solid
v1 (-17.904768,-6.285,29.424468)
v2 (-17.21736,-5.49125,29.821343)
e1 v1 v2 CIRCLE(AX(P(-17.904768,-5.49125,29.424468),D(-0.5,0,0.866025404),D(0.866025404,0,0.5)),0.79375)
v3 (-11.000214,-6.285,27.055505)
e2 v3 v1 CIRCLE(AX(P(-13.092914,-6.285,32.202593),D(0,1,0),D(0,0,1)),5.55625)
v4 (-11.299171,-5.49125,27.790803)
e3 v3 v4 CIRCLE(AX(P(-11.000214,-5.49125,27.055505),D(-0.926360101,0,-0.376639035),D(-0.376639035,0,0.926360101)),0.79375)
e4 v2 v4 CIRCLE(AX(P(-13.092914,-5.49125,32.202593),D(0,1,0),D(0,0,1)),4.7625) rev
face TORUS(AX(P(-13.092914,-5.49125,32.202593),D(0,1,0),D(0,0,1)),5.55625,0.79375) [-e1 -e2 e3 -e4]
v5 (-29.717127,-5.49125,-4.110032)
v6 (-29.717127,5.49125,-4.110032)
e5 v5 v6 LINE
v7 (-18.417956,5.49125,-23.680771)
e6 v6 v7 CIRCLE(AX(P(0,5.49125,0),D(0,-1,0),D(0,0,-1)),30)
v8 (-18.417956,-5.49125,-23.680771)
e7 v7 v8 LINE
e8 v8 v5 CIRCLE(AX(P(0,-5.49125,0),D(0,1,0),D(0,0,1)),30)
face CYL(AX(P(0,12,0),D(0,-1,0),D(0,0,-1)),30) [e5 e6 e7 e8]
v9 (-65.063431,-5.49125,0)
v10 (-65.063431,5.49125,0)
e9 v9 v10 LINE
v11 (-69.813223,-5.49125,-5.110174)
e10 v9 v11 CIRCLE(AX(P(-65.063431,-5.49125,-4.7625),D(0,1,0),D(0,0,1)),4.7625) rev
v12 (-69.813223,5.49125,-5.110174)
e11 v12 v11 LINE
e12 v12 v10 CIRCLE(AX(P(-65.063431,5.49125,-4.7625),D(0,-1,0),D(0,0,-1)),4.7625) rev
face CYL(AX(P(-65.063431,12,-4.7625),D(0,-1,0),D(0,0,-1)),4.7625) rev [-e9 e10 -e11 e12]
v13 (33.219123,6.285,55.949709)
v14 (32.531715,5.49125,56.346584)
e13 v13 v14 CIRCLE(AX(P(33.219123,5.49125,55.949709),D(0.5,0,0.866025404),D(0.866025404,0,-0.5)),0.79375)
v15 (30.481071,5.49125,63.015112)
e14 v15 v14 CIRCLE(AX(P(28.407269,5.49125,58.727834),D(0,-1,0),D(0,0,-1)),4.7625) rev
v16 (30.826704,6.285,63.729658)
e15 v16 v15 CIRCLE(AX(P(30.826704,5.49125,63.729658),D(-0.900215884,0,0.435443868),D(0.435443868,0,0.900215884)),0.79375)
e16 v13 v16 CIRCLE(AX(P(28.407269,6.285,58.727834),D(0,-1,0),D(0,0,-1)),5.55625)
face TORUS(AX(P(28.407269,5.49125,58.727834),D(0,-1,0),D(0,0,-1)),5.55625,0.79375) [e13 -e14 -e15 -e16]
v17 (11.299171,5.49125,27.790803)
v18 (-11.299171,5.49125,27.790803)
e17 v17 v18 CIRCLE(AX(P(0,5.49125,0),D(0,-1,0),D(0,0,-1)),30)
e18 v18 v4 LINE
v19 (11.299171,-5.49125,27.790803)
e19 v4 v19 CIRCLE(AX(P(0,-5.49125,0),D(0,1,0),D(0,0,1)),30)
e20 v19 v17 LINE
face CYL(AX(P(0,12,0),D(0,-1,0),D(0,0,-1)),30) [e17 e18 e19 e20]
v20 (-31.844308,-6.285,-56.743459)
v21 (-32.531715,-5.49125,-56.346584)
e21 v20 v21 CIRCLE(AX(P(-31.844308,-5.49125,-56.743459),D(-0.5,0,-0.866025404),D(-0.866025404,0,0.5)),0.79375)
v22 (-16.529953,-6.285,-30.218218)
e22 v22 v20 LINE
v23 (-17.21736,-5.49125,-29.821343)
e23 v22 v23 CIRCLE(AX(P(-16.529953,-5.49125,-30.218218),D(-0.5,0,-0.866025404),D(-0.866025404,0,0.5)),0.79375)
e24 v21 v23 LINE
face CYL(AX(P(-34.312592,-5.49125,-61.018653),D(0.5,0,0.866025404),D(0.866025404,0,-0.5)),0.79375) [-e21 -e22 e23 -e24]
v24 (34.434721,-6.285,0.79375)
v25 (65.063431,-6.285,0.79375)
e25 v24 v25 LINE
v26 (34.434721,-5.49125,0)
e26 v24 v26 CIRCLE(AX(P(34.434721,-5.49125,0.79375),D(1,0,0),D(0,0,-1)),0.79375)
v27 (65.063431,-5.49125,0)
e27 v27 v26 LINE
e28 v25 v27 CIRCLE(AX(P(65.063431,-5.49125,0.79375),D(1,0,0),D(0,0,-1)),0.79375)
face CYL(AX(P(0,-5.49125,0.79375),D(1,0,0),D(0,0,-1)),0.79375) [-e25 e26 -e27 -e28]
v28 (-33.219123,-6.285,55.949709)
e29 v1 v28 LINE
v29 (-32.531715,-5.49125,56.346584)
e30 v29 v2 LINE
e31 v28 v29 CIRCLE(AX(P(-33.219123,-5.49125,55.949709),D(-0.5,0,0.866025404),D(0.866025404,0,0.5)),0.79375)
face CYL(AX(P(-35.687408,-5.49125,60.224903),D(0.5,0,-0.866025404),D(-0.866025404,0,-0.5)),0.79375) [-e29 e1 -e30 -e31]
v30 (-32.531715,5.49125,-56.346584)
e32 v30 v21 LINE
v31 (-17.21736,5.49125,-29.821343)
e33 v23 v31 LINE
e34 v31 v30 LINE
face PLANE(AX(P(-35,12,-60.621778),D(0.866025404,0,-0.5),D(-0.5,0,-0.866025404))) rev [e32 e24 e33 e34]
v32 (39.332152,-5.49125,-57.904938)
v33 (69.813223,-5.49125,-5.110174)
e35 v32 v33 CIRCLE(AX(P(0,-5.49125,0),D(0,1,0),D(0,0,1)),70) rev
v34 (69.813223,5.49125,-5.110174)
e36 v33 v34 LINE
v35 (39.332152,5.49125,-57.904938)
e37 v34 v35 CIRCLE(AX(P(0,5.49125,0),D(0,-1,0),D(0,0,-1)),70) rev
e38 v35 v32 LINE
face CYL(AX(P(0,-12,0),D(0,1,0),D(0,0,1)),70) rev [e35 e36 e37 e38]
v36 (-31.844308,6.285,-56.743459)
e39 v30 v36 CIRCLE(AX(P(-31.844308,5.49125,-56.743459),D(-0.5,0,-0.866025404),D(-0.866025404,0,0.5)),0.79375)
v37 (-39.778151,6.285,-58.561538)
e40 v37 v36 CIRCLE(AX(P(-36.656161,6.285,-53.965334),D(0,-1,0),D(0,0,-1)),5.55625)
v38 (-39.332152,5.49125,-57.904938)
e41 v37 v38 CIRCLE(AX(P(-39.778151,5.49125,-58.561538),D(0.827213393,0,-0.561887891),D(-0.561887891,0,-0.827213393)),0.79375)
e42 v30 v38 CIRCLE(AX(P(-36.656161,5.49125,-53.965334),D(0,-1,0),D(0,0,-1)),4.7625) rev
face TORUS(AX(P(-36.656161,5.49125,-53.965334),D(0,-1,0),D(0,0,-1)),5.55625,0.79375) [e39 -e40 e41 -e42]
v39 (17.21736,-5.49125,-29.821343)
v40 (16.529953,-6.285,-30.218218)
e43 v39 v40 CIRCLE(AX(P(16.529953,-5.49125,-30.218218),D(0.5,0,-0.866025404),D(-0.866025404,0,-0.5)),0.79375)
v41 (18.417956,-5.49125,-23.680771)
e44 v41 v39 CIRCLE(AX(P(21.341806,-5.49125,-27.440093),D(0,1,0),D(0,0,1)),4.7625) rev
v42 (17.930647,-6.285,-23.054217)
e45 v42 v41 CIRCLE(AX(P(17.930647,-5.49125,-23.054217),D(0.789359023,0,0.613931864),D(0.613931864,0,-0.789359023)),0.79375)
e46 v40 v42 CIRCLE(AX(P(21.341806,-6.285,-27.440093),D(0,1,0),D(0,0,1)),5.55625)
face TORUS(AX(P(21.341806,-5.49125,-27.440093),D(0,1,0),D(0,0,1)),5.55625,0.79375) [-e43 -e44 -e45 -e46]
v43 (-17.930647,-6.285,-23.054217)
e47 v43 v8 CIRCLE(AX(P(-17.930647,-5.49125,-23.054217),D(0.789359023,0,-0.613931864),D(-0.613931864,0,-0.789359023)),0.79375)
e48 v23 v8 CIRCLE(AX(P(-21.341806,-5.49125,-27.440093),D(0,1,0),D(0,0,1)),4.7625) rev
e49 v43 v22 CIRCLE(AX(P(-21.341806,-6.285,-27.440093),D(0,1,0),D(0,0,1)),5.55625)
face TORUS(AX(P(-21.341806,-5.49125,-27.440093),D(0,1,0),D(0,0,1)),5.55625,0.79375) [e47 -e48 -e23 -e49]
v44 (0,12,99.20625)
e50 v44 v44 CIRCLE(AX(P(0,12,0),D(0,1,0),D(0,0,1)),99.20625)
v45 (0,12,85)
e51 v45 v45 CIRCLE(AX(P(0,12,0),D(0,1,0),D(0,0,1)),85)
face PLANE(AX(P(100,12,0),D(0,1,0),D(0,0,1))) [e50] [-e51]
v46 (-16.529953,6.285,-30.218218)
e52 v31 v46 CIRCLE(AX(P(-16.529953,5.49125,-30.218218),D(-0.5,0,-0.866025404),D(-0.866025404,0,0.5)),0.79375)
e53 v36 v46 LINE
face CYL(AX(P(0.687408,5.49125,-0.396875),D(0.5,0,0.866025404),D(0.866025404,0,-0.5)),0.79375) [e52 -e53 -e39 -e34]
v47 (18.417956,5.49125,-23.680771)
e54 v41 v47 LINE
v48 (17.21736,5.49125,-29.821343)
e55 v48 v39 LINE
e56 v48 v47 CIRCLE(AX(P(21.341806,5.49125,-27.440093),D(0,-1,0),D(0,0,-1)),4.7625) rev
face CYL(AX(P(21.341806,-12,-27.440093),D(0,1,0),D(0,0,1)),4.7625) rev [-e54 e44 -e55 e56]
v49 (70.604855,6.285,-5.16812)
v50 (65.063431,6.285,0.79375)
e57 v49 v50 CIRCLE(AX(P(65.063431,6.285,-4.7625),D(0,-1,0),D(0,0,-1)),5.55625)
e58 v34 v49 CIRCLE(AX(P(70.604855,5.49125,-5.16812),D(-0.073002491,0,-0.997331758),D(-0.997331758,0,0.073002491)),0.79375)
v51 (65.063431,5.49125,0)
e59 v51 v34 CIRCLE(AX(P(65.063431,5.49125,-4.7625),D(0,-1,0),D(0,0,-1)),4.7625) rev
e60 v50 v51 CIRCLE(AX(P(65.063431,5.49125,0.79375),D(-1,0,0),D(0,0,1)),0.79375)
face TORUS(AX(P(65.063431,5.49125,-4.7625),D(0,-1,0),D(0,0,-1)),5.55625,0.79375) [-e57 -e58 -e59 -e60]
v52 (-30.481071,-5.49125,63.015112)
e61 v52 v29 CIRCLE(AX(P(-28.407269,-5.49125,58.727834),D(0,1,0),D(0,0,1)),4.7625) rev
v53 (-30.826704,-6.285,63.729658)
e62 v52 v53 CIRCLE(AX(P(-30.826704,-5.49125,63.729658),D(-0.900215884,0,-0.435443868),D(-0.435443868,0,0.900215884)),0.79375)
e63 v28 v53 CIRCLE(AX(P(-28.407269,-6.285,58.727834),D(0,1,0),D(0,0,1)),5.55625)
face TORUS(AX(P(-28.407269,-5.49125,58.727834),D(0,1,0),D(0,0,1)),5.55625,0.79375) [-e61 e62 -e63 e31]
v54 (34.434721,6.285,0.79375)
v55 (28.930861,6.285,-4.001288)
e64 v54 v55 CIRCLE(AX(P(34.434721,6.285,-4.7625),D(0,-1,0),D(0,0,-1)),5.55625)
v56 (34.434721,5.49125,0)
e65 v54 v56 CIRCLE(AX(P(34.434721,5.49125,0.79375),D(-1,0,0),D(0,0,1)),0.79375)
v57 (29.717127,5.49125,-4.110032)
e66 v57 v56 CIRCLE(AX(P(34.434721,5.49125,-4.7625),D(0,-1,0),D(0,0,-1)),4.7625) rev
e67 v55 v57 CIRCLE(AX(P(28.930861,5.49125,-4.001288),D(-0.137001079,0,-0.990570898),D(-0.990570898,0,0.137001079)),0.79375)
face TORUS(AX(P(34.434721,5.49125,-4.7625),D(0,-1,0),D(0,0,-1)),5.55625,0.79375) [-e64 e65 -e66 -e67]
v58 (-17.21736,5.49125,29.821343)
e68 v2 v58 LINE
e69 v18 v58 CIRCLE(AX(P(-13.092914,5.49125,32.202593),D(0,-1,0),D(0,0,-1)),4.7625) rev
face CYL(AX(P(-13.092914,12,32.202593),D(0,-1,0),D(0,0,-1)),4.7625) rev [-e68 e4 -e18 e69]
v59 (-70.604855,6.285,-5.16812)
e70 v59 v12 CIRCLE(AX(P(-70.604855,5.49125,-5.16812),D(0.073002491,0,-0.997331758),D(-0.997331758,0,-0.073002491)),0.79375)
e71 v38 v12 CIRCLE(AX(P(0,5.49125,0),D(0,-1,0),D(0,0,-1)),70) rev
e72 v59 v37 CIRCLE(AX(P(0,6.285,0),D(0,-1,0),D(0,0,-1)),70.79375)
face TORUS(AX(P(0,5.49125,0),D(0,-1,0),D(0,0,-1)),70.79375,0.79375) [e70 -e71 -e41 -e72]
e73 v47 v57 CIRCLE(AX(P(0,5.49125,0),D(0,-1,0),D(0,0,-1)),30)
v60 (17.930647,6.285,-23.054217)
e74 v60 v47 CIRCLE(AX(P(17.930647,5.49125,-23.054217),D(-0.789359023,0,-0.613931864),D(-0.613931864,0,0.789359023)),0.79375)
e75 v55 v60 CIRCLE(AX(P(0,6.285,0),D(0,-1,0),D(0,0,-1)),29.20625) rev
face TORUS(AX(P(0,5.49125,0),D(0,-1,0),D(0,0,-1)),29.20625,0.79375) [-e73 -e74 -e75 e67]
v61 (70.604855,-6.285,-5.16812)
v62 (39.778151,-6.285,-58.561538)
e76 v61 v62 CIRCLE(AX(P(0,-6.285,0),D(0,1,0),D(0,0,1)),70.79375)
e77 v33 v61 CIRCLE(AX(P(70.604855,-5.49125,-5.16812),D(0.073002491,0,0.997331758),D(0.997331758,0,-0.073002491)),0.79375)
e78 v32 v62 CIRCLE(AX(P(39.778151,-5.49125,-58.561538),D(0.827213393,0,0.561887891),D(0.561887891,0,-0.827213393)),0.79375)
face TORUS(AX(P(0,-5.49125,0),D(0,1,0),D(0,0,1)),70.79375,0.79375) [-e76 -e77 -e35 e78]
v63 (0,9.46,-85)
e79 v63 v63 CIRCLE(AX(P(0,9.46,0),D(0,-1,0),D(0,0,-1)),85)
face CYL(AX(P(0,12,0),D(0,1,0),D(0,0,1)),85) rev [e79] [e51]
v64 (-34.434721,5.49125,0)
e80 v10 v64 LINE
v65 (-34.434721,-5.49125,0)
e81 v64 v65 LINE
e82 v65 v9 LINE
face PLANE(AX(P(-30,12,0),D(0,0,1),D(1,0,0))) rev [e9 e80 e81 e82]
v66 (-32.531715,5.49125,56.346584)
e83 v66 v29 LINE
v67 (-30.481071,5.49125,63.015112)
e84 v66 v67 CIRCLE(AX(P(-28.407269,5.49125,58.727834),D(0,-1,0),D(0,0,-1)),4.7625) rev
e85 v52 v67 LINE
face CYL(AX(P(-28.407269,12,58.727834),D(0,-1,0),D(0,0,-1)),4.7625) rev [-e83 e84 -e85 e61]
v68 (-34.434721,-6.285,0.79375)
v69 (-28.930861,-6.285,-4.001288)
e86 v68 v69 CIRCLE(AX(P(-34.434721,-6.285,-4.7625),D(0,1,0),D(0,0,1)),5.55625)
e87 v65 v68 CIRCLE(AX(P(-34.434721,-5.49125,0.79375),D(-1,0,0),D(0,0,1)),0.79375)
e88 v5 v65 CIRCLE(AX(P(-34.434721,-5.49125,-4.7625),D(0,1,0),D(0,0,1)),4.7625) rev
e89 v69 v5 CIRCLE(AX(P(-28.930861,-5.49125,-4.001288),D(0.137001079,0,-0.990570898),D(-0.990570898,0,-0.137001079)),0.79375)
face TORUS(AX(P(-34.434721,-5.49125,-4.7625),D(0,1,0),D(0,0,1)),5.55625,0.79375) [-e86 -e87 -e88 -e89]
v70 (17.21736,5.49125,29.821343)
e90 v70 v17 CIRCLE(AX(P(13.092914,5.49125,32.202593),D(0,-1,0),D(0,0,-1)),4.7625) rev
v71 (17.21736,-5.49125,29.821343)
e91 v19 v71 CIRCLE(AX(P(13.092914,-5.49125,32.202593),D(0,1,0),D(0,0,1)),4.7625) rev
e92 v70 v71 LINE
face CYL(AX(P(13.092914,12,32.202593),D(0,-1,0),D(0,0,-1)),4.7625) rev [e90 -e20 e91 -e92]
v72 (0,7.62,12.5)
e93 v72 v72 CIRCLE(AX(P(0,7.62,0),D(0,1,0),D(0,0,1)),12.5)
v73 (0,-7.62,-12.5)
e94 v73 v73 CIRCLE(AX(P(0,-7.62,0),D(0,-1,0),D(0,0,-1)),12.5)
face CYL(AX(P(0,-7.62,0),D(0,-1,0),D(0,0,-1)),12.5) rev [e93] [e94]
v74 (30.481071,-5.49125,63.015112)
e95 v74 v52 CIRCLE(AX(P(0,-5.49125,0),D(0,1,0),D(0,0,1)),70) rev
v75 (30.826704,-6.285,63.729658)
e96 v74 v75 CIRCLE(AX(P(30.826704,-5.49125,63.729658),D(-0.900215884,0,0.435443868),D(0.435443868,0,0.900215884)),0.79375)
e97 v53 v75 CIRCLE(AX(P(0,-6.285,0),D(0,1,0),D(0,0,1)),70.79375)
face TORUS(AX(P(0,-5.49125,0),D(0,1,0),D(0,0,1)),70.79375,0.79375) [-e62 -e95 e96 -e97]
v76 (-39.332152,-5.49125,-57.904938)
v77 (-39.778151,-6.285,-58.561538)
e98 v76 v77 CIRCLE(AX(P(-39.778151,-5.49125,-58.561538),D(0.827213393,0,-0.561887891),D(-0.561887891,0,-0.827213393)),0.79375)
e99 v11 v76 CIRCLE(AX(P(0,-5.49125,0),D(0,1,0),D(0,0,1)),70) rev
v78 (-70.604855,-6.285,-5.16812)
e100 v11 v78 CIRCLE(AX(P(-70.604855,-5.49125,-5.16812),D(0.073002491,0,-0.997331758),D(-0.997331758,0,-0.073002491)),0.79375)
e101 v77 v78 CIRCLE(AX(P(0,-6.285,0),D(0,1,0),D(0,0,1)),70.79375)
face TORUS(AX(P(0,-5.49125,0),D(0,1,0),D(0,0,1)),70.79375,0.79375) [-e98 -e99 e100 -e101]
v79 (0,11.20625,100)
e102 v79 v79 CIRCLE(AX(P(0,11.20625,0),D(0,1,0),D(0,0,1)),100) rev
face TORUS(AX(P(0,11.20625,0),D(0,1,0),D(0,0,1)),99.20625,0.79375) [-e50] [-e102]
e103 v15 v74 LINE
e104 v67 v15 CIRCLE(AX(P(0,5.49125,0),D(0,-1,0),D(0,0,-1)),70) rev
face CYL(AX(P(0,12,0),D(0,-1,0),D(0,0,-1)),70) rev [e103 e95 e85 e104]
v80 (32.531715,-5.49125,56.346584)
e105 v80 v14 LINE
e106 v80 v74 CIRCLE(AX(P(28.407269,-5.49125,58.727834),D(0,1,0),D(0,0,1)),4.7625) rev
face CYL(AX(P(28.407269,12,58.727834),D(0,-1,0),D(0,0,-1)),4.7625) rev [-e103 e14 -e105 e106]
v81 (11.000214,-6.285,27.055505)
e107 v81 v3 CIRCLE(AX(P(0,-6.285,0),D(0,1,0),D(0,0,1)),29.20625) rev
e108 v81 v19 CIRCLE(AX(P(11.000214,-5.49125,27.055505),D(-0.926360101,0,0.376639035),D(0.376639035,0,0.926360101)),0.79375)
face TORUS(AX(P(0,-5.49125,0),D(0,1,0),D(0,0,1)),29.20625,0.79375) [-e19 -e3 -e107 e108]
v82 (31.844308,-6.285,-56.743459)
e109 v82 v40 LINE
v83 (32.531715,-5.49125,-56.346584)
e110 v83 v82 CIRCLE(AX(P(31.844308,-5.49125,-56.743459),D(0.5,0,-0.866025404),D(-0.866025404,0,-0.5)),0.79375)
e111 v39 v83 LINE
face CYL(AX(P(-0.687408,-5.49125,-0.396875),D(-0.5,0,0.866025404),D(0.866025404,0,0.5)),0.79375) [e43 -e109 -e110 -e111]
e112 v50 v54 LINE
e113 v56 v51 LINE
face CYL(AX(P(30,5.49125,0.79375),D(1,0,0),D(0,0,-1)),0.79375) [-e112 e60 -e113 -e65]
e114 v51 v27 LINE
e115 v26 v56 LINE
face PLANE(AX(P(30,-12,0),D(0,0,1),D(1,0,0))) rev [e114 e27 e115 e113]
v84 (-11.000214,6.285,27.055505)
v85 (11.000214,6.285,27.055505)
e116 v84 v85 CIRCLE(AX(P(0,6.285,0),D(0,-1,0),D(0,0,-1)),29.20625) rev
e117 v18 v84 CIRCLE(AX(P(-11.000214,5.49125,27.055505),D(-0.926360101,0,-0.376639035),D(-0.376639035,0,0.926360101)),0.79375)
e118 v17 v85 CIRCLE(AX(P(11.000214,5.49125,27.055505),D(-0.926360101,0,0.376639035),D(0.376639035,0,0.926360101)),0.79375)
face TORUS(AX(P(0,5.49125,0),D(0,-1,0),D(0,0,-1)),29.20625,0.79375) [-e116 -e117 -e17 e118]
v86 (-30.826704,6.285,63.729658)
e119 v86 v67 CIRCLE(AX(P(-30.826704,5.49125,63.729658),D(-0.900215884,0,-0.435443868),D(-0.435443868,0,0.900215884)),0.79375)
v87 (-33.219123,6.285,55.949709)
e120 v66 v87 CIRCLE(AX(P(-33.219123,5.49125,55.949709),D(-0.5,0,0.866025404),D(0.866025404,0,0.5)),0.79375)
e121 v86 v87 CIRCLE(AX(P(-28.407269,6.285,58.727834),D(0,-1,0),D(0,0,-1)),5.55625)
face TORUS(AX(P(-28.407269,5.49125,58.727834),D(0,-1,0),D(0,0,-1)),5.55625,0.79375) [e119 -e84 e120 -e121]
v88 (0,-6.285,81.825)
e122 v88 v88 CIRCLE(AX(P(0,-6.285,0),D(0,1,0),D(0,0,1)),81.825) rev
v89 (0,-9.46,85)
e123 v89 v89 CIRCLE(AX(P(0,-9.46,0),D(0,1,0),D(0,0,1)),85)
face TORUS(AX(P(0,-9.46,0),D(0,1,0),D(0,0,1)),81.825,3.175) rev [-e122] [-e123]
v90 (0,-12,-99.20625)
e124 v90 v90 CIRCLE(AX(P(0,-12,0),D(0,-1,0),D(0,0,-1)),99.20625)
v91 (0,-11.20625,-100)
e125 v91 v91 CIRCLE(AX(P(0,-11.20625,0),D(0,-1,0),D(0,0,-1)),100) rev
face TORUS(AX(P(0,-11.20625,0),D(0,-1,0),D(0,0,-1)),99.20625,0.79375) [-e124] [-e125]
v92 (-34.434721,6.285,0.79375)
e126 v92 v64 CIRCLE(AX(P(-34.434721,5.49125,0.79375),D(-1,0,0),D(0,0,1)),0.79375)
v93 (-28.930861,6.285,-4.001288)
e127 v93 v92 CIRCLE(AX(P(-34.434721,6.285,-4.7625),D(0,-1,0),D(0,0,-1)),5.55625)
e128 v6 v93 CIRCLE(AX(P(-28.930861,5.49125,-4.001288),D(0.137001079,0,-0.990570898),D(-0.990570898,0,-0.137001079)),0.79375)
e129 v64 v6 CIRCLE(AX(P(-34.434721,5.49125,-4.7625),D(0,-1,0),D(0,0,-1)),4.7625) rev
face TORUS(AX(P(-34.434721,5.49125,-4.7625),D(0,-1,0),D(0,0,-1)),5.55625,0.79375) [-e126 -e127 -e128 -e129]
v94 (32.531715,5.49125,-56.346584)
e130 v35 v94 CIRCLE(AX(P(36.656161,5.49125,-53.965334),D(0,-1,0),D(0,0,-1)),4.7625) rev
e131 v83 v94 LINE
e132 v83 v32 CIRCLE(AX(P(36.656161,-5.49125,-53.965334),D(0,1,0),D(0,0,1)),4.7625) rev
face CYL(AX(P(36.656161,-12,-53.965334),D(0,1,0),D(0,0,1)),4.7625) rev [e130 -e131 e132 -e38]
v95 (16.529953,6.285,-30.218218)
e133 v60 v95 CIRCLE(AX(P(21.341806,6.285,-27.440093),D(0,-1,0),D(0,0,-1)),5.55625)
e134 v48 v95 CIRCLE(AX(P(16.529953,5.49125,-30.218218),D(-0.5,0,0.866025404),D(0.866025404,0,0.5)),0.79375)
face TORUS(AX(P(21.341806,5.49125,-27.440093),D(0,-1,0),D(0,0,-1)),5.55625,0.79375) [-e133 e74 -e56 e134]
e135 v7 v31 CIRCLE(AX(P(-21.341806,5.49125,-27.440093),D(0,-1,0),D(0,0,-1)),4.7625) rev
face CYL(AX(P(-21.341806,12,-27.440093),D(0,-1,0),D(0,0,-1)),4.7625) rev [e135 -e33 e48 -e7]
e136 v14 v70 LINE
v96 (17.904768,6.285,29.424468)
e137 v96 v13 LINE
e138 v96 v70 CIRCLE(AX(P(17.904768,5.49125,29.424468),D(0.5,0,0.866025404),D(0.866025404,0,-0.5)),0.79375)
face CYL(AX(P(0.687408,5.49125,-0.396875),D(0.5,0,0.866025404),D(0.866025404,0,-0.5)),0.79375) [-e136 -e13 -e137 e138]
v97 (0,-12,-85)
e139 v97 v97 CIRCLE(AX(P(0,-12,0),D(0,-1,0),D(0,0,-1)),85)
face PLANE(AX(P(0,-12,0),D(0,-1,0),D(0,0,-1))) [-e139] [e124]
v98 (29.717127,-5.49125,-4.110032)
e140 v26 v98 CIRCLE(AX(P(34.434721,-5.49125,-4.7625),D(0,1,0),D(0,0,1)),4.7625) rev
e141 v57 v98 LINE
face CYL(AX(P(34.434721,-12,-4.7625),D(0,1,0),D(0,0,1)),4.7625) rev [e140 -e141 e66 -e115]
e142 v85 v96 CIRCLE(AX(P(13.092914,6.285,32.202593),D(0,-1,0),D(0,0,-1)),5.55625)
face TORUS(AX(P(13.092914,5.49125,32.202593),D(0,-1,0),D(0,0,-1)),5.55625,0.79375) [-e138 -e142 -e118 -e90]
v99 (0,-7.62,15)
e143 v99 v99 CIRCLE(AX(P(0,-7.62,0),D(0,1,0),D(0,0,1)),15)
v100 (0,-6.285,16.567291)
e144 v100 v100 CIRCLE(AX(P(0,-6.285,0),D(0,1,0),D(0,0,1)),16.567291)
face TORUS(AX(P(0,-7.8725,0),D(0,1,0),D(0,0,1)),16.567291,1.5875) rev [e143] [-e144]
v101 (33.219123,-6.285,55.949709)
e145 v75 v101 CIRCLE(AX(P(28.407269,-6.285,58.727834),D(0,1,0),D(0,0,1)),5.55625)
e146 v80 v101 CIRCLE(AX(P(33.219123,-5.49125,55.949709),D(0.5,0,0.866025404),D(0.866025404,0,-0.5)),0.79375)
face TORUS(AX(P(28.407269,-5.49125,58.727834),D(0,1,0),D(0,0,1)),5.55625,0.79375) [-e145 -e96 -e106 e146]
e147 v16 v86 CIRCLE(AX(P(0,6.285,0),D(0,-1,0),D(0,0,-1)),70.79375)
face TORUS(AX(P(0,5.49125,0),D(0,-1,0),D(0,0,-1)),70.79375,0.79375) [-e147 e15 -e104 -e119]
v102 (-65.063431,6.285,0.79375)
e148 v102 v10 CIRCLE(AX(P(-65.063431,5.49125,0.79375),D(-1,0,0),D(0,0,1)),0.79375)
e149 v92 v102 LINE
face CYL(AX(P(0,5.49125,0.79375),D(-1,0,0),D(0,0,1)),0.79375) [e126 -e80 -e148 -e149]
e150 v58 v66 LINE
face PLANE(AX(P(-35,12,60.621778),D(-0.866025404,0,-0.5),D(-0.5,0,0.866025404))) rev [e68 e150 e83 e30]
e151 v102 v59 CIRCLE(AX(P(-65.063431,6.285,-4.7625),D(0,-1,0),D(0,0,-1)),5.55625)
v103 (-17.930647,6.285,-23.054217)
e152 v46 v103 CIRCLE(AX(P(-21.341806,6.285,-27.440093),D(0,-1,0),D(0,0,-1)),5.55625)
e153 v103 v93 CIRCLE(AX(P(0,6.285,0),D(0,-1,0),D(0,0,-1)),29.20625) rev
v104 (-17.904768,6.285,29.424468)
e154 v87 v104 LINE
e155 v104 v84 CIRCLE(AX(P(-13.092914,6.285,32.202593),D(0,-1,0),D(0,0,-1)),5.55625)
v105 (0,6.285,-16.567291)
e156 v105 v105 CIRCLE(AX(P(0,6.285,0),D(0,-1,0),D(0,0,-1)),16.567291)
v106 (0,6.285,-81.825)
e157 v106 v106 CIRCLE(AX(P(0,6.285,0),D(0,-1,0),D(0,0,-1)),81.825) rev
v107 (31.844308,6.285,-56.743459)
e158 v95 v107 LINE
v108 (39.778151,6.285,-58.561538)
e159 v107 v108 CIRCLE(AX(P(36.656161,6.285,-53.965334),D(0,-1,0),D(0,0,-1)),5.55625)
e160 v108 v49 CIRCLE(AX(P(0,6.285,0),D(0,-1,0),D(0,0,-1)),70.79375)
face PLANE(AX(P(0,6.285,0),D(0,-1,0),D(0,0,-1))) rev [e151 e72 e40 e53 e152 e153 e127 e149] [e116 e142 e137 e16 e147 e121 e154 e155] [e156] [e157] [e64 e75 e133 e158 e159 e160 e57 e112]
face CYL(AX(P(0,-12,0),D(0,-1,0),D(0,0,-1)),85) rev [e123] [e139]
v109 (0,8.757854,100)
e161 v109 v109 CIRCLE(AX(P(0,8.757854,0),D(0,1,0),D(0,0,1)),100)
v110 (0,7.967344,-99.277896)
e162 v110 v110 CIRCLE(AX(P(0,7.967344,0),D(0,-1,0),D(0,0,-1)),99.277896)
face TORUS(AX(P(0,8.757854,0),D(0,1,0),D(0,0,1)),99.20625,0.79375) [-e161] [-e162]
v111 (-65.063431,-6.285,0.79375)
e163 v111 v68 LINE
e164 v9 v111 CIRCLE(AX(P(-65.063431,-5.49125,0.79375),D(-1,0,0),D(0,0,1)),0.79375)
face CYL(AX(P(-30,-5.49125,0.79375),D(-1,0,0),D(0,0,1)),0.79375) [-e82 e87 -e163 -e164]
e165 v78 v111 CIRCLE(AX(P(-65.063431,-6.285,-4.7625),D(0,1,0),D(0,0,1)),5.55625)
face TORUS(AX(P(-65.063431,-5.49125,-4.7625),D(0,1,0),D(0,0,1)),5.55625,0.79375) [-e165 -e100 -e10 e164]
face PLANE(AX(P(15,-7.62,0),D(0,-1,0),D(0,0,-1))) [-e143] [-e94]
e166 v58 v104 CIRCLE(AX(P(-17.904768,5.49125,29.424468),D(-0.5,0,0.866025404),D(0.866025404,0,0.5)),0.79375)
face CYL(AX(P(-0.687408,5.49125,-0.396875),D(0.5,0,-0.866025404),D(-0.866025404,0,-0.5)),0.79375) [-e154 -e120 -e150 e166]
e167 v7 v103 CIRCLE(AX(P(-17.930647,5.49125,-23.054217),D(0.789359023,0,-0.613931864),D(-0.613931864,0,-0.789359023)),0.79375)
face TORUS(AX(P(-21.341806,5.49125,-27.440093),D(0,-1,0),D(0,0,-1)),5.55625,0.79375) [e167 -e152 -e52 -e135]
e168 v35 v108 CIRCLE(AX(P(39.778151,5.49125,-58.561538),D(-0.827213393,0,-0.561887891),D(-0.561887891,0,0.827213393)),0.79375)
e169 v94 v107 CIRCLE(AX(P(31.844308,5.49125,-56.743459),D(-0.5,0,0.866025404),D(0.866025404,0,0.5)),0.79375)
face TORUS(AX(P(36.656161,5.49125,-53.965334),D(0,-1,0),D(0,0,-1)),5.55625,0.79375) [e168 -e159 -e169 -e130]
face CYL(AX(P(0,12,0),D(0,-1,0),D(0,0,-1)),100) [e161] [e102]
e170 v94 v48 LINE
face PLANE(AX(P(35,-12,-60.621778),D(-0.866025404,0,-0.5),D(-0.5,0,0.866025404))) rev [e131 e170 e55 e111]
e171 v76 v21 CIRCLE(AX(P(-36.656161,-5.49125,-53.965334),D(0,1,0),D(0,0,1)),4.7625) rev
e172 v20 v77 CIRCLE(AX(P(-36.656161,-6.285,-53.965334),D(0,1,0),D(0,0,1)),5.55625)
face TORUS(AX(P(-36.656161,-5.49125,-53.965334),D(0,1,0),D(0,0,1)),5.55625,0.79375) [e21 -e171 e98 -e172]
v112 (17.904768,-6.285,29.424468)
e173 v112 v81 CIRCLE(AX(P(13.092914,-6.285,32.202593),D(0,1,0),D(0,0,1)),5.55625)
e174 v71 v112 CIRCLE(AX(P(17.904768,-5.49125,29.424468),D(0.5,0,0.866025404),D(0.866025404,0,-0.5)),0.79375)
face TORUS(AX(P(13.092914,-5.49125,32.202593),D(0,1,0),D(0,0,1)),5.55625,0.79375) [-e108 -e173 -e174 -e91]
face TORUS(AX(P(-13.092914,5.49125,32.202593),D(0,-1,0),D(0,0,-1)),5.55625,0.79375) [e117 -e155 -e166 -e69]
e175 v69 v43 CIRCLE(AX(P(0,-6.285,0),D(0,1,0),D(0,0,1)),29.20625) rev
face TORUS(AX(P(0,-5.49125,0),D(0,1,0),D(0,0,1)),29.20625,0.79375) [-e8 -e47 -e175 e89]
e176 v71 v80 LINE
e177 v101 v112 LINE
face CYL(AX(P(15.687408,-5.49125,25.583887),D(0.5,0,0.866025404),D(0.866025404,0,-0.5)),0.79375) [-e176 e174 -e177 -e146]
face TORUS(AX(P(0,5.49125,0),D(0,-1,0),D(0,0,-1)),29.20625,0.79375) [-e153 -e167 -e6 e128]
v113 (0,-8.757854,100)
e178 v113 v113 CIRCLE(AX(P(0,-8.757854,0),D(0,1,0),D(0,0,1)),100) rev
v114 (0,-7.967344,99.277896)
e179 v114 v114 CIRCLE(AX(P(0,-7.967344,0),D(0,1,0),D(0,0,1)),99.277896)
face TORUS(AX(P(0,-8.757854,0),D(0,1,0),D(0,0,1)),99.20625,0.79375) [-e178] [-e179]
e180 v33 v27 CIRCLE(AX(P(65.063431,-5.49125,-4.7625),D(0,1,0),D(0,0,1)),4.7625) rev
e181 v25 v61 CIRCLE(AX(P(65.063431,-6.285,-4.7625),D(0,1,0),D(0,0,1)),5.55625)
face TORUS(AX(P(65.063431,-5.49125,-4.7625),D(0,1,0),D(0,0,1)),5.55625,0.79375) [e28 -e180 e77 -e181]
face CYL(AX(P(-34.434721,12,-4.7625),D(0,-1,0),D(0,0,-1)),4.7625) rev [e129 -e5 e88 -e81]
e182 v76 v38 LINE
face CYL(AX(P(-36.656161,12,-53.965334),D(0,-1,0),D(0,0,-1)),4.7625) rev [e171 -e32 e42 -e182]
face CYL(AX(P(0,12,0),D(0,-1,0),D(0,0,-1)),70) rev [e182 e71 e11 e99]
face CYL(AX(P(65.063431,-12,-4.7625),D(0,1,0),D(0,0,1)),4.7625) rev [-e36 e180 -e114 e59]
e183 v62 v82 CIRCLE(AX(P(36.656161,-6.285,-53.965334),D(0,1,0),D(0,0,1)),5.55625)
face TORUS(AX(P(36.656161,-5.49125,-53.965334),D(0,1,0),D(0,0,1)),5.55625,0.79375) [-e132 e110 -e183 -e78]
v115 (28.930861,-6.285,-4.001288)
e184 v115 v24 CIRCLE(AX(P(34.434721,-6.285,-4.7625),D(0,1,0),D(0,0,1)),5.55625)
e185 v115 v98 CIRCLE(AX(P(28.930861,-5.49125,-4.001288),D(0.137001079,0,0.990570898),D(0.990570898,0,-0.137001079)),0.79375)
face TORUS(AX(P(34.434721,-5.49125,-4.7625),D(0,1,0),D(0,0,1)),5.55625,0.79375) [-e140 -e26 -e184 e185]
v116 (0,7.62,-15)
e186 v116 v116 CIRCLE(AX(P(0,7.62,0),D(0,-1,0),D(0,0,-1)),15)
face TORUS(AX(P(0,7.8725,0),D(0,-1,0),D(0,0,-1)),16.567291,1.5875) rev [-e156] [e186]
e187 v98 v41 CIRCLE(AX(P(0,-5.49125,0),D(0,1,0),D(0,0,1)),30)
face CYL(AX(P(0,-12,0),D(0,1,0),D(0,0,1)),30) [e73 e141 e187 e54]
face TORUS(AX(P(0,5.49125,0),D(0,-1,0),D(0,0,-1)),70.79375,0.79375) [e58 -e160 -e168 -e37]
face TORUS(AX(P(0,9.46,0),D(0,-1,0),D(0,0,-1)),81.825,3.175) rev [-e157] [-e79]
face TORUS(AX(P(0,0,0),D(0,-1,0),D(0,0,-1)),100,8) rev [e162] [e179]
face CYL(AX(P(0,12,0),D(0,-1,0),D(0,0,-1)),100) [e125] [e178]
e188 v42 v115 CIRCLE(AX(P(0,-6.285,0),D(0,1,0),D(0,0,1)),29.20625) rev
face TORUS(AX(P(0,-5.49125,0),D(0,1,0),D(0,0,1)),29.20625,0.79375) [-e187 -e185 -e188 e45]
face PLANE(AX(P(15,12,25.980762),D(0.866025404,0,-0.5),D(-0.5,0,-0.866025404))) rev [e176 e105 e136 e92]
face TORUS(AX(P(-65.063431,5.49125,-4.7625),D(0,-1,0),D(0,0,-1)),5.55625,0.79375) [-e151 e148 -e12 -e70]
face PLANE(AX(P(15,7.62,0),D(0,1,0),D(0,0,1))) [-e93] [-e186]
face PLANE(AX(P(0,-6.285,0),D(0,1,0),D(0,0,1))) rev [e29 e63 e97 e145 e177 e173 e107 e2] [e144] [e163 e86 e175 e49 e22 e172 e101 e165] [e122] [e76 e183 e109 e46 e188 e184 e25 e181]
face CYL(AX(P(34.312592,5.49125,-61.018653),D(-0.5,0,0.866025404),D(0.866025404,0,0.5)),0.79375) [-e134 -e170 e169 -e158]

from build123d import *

# Parameters (mm, degrees)
HOLE1_D                   = 170
HOLE1_DEPTH               = 5.715
HOLE2_D                   = 170
HOLE2_DEPTH               = 5.715
CUT_EXTRUDE1_DEPTH        = 143.598531637
CUT_EXTRUDE2_DEPTH        = 143.598531637
CUT_EXTRUDE3_DEPTH        = 143.598531637
SKETCH9_W                 = 15
SKETCH9_H                 = 5.715
SKETCH10_W                = 15
SKETCH10_H                = 6.539353837
M18_CLEARANCE_HOLE1_D     = 25
M18_CLEARANCE_HOLE1_DEPTH = 19.62
M18_CLEARANCE_HOLE1_TIP   = 7.510757738
FILLET1_R                 = 4.7625
FILLET2_R                 = 0.79375
FILLET3_R                 = 1.5875
FILLET4_R                 = 3.175


with BuildPart() as part:
    # Sketch1 → Revolve1 (revolve)
    with BuildSketch(Plane.XY, mode=Mode.PRIVATE) as revolve1_sk:
        with BuildLine():
            Line((100, 12), (0, 12))
            Line((0, 12), (0, -12))
            Line((0, -12), (100, -12))
            Line((100, -12), (100, -8))
            ThreePointArc((100, -8), (92, 0), (100, 8))
            Line((100, 8), (100, 12))
        make_face()
    revolve(revolve1_sk.sketch.rotate(Axis((0, 12, 0), (0, -1, 0)), 270), axis=Axis((0, 12, 0), (0, -1, 0)))

    # Hole1
    with Locations(Plane(origin=(0, -12, 0), x_dir=(-1, 0, 0), z_dir=(0, -1, 0))):
        with Locations((0, 0)):
            Hole(HOLE1_D / 2, depth=HOLE1_DEPTH)

    # Hole2
    with Locations(Plane(origin=(0, 12, 0), x_dir=(1, 0, 0), z_dir=(0, 1, 0))):
        with Locations((0, 0)):
            Hole(HOLE2_D / 2, depth=HOLE2_DEPTH)

    # Sketch6 → Cut-Extrude1 (cut, through all)
    with BuildSketch(Plane.XZ.offset(6.285)):
        with BuildLine():
            Line((-35, -60.621778265), (-15, -25.980762114))
            ThreePointArc((-15, -25.980762114), (-25.980762114, -15), (-30, 0))
            Line((-30, 0), (-70, 0))
            ThreePointArc((-70, 0), (-60.621778265, -35), (-35, -60.621778265))
        make_face()
    extrude(amount=-CUT_EXTRUDE1_DEPTH, mode=Mode.SUBTRACT)

    # Sketch7 → Cut-Extrude2 (cut, through all)
    with BuildSketch(Plane.XZ.offset(6.285)):
        with BuildLine():
            Line((-35, 60.621778265), (-15, 25.980762114))
            ThreePointArc((-15, 25.980762114), (0, 30), (15, 25.980762114))
            Line((15, 25.980762114), (35, 60.621778265))
            ThreePointArc((35, 60.621778265), (0, 70), (-35, 60.621778265))
        make_face()
    extrude(amount=-CUT_EXTRUDE2_DEPTH, mode=Mode.SUBTRACT)

    # Sketch8 → Cut-Extrude3 (cut, through all)
    with BuildSketch(Plane(origin=(0, 6.285, 0), x_dir=(-1, 0, 0), z_dir=(0, 1, 0))):
        with BuildLine():
            Line((-35, -60.621778265), (-15, -25.980762114))
            ThreePointArc((-15, -25.980762114), (-25.980762114, -15), (-30, 0))
            Line((-30, 0), (-70, 0))
            ThreePointArc((-70, 0), (-60.621778265, -35), (-35, -60.621778265))
        make_face()
    extrude(amount=-CUT_EXTRUDE3_DEPTH, mode=Mode.SUBTRACT)

    # Sketch9 → Revolve2 (revolve)
    with BuildSketch(Plane.XY, mode=Mode.PRIVATE) as revolve2_sk:
        with Locations((7.5, 4.7625)):
            Rectangle(SKETCH9_W, SKETCH9_H)
    revolve(revolve2_sk.sketch.rotate(Axis((0, 7.62, 0), (0, -1, 0)), 270), axis=Axis((0, 7.62, 0), (0, -1, 0)))

    # Sketch10 → Revolve3 (revolve)
    with BuildSketch(Plane(origin=(0, 0, 0), x_dir=(-1, 0, 0), z_dir=(0, 0, -1)), mode=Mode.PRIVATE) as revolve3_sk:
        with Locations((-7.5, -4.350323082)):
            Rectangle(SKETCH10_W, SKETCH10_H)
    revolve(revolve3_sk.sketch.rotate(Axis((0, -7.62, 0), (0, 1, 0)), 270), axis=Axis((0, -7.62, 0), (0, 1, 0)))

    # M18 Clearance Hole1
    with Locations(Plane(origin=(0, -7.62, 0), x_dir=(-1, 0, 0), z_dir=(0, -1, 0))):
        with Locations((0, 0)):
            Hole(M18_CLEARANCE_HOLE1_D / 2, depth=M18_CLEARANCE_HOLE1_DEPTH)
            with Locations((0, 0, -(M18_CLEARANCE_HOLE1_DEPTH + M18_CLEARANCE_HOLE1_TIP / 2))):  # 118° drill point
                Cone(0, M18_CLEARANCE_HOLE1_D / 2, M18_CLEARANCE_HOLE1_TIP, mode=Mode.SUBTRACT)

    # Fillet1
    fillet1_edges = [part.edges().sort_by_distance(p)[0] for p in [
        (-35, 0, -60.621778265),
        (-70, 0, 0),
        (-30, 0, 0),
        (-15, 0, -25.980762114),
        (-35, 0, 60.621778265),
        (35, 0, 60.621778265),
        (15, 0, 25.980762114),
        (-15, 0, 25.980762114),
        (35, 0, -60.621778265),
        (70, 0, 0),
        (30, 0, 0),
        (15, 0, -25.980762114),
    ]]
    fillet(fillet1_edges, radius=FILLET1_R)

    # Fillet2
    fillet2_edges = [part.edges().sort_by_distance(p)[0] for p in [
        (-24.87453786, -6.285, 43.083963388),
        (-24.87453786, 6.285, 43.083963388),
        (0, -6.285, 70),
        (0, 6.285, 70),
        (24.87453786, -6.285, 43.083963388),
        (24.87453786, 6.285, 43.083963388),
        (0, -6.285, 30),
        (0, 6.285, 30),
        (25.980762114, 6.285, -15),
        (25.980762114, -6.285, -15),
        (24.87453786, 6.285, -43.083963388),
        (24.87453786, -6.285, -43.083963388),
        (-49.749075719, -6.285, 0),
        (-49.749075719, 6.285, 0),
        (60.621778265, 6.285, -35),
        (60.621778265, -6.285, -35),
        (49.749075719, 6.285, 0),
        (49.749075719, -6.285, 0),
        (-25.980762114, -6.285, -15),
        (-25.980762114, 6.285, -15),
        (-35.592384032, -6.285, -58.607508261),
        (-35.592384032, 6.285, -58.607508261),
        (-32.959398991, -6.285, 60.127662883),
        (-32.959398991, 6.285, 60.127662883),
        (14.638494198, -6.285, 27.697863351),
        (14.638494198, 6.285, 27.697863351),
        (16.667806194, 6.285, -26.526239524),
        (16.667806194, -6.285, -26.526239524),
        (-68.551783023, -6.285, -1.520154622),
        (-68.551783023, 6.285, -1.520154622),
        (35.592384032, 6.285, -58.607508261),
        (35.592384032, -6.285, -58.607508261),
        (-14.638494198, -6.285, 27.697863351),
        (-14.638494198, 6.285, 27.697863351),
        (68.551783023, 6.285, -1.520154622),
        (68.551783023, -6.285, -1.520154622),
        (32.959398991, -6.285, 60.127662883),
        (32.959398991, 6.285, 60.127662883),
        (-16.667806194, -6.285, -26.526239524),
        (-16.667806194, 6.285, -26.526239524),
        (-31.306300392, -6.285, -1.171623827),
        (-31.306300392, 6.285, -1.171623827),
        (31.306300392, 6.285, -1.171623827),
        (31.306300392, -6.285, -1.171623827),
        (0, 12, 100),
        (0, -12, 100),
        (0, -8, 100),
        (0, 8, 100),
        (-24.87453786, -6.285, -43.083963388),
        (-24.87453786, 6.285, -43.083963388),
        (-60.621778265, -6.285, -35),
        (-60.621778265, 6.285, -35),
    ]]
    fillet(fillet2_edges, radius=FILLET2_R)

    # Fillet3
    # the kernel refuses this fillet: 1.5875 mm, written as the material it adds along each edge
    with BuildSketch(Plane(origin=(0, 6.285, 0), x_dir=(0, 0, -1), z_dir=(1, 0, 0))) as fillet3_piece_1:
        with BuildLine():
            CenterArc((16.567290656, 1.5875), FILLET3_R, 189.152056164, 80.847943836)
            Line((15, 1.335), (14.968654187, 1.32995))
            ThreePointArc((14.968654187, 1.32995), (14.96825, 0.6675), (14.96825, 0))
            Line((14.96825, 0), (15, -0.03175))
            Line((15, -0.03175), (16.567290656, -0.03175))
            Line((16.567290656, -0.03175), (16.567290656, 0))
        make_face()
    revolve(axis=Axis((0, 6.285, 0), (0, 1, 0)))
    with BuildSketch(Plane(origin=(0, -6.285, 0), x_dir=(0, 0, 1), z_dir=(1, 0, 0))) as fillet3_piece_2:
        with BuildLine():
            CenterArc((16.567290656, 1.5875), FILLET3_R, 189.152056164, 80.847943836)
            Line((15, 1.335), (14.968654187, 1.32995))
            ThreePointArc((14.968654187, 1.32995), (14.96825, 0.6675), (14.96825, 0))
            Line((14.96825, 0), (15, -0.03175))
            Line((15, -0.03175), (16.567290656, -0.03175))
            Line((16.567290656, -0.03175), (16.567290656, 0))
        make_face()
    revolve(axis=Axis((0, -6.285, 0), (0, -1, 0)))

    # Fillet4
    fillet4_edges = [part.edges().sort_by_distance(p)[0] for p in [
        (-85, -6.285, 0),
        (85, 6.285, 0),
    ]]
    fillet(fillet4_edges, radius=FILLET4_R)


solid = part.part
